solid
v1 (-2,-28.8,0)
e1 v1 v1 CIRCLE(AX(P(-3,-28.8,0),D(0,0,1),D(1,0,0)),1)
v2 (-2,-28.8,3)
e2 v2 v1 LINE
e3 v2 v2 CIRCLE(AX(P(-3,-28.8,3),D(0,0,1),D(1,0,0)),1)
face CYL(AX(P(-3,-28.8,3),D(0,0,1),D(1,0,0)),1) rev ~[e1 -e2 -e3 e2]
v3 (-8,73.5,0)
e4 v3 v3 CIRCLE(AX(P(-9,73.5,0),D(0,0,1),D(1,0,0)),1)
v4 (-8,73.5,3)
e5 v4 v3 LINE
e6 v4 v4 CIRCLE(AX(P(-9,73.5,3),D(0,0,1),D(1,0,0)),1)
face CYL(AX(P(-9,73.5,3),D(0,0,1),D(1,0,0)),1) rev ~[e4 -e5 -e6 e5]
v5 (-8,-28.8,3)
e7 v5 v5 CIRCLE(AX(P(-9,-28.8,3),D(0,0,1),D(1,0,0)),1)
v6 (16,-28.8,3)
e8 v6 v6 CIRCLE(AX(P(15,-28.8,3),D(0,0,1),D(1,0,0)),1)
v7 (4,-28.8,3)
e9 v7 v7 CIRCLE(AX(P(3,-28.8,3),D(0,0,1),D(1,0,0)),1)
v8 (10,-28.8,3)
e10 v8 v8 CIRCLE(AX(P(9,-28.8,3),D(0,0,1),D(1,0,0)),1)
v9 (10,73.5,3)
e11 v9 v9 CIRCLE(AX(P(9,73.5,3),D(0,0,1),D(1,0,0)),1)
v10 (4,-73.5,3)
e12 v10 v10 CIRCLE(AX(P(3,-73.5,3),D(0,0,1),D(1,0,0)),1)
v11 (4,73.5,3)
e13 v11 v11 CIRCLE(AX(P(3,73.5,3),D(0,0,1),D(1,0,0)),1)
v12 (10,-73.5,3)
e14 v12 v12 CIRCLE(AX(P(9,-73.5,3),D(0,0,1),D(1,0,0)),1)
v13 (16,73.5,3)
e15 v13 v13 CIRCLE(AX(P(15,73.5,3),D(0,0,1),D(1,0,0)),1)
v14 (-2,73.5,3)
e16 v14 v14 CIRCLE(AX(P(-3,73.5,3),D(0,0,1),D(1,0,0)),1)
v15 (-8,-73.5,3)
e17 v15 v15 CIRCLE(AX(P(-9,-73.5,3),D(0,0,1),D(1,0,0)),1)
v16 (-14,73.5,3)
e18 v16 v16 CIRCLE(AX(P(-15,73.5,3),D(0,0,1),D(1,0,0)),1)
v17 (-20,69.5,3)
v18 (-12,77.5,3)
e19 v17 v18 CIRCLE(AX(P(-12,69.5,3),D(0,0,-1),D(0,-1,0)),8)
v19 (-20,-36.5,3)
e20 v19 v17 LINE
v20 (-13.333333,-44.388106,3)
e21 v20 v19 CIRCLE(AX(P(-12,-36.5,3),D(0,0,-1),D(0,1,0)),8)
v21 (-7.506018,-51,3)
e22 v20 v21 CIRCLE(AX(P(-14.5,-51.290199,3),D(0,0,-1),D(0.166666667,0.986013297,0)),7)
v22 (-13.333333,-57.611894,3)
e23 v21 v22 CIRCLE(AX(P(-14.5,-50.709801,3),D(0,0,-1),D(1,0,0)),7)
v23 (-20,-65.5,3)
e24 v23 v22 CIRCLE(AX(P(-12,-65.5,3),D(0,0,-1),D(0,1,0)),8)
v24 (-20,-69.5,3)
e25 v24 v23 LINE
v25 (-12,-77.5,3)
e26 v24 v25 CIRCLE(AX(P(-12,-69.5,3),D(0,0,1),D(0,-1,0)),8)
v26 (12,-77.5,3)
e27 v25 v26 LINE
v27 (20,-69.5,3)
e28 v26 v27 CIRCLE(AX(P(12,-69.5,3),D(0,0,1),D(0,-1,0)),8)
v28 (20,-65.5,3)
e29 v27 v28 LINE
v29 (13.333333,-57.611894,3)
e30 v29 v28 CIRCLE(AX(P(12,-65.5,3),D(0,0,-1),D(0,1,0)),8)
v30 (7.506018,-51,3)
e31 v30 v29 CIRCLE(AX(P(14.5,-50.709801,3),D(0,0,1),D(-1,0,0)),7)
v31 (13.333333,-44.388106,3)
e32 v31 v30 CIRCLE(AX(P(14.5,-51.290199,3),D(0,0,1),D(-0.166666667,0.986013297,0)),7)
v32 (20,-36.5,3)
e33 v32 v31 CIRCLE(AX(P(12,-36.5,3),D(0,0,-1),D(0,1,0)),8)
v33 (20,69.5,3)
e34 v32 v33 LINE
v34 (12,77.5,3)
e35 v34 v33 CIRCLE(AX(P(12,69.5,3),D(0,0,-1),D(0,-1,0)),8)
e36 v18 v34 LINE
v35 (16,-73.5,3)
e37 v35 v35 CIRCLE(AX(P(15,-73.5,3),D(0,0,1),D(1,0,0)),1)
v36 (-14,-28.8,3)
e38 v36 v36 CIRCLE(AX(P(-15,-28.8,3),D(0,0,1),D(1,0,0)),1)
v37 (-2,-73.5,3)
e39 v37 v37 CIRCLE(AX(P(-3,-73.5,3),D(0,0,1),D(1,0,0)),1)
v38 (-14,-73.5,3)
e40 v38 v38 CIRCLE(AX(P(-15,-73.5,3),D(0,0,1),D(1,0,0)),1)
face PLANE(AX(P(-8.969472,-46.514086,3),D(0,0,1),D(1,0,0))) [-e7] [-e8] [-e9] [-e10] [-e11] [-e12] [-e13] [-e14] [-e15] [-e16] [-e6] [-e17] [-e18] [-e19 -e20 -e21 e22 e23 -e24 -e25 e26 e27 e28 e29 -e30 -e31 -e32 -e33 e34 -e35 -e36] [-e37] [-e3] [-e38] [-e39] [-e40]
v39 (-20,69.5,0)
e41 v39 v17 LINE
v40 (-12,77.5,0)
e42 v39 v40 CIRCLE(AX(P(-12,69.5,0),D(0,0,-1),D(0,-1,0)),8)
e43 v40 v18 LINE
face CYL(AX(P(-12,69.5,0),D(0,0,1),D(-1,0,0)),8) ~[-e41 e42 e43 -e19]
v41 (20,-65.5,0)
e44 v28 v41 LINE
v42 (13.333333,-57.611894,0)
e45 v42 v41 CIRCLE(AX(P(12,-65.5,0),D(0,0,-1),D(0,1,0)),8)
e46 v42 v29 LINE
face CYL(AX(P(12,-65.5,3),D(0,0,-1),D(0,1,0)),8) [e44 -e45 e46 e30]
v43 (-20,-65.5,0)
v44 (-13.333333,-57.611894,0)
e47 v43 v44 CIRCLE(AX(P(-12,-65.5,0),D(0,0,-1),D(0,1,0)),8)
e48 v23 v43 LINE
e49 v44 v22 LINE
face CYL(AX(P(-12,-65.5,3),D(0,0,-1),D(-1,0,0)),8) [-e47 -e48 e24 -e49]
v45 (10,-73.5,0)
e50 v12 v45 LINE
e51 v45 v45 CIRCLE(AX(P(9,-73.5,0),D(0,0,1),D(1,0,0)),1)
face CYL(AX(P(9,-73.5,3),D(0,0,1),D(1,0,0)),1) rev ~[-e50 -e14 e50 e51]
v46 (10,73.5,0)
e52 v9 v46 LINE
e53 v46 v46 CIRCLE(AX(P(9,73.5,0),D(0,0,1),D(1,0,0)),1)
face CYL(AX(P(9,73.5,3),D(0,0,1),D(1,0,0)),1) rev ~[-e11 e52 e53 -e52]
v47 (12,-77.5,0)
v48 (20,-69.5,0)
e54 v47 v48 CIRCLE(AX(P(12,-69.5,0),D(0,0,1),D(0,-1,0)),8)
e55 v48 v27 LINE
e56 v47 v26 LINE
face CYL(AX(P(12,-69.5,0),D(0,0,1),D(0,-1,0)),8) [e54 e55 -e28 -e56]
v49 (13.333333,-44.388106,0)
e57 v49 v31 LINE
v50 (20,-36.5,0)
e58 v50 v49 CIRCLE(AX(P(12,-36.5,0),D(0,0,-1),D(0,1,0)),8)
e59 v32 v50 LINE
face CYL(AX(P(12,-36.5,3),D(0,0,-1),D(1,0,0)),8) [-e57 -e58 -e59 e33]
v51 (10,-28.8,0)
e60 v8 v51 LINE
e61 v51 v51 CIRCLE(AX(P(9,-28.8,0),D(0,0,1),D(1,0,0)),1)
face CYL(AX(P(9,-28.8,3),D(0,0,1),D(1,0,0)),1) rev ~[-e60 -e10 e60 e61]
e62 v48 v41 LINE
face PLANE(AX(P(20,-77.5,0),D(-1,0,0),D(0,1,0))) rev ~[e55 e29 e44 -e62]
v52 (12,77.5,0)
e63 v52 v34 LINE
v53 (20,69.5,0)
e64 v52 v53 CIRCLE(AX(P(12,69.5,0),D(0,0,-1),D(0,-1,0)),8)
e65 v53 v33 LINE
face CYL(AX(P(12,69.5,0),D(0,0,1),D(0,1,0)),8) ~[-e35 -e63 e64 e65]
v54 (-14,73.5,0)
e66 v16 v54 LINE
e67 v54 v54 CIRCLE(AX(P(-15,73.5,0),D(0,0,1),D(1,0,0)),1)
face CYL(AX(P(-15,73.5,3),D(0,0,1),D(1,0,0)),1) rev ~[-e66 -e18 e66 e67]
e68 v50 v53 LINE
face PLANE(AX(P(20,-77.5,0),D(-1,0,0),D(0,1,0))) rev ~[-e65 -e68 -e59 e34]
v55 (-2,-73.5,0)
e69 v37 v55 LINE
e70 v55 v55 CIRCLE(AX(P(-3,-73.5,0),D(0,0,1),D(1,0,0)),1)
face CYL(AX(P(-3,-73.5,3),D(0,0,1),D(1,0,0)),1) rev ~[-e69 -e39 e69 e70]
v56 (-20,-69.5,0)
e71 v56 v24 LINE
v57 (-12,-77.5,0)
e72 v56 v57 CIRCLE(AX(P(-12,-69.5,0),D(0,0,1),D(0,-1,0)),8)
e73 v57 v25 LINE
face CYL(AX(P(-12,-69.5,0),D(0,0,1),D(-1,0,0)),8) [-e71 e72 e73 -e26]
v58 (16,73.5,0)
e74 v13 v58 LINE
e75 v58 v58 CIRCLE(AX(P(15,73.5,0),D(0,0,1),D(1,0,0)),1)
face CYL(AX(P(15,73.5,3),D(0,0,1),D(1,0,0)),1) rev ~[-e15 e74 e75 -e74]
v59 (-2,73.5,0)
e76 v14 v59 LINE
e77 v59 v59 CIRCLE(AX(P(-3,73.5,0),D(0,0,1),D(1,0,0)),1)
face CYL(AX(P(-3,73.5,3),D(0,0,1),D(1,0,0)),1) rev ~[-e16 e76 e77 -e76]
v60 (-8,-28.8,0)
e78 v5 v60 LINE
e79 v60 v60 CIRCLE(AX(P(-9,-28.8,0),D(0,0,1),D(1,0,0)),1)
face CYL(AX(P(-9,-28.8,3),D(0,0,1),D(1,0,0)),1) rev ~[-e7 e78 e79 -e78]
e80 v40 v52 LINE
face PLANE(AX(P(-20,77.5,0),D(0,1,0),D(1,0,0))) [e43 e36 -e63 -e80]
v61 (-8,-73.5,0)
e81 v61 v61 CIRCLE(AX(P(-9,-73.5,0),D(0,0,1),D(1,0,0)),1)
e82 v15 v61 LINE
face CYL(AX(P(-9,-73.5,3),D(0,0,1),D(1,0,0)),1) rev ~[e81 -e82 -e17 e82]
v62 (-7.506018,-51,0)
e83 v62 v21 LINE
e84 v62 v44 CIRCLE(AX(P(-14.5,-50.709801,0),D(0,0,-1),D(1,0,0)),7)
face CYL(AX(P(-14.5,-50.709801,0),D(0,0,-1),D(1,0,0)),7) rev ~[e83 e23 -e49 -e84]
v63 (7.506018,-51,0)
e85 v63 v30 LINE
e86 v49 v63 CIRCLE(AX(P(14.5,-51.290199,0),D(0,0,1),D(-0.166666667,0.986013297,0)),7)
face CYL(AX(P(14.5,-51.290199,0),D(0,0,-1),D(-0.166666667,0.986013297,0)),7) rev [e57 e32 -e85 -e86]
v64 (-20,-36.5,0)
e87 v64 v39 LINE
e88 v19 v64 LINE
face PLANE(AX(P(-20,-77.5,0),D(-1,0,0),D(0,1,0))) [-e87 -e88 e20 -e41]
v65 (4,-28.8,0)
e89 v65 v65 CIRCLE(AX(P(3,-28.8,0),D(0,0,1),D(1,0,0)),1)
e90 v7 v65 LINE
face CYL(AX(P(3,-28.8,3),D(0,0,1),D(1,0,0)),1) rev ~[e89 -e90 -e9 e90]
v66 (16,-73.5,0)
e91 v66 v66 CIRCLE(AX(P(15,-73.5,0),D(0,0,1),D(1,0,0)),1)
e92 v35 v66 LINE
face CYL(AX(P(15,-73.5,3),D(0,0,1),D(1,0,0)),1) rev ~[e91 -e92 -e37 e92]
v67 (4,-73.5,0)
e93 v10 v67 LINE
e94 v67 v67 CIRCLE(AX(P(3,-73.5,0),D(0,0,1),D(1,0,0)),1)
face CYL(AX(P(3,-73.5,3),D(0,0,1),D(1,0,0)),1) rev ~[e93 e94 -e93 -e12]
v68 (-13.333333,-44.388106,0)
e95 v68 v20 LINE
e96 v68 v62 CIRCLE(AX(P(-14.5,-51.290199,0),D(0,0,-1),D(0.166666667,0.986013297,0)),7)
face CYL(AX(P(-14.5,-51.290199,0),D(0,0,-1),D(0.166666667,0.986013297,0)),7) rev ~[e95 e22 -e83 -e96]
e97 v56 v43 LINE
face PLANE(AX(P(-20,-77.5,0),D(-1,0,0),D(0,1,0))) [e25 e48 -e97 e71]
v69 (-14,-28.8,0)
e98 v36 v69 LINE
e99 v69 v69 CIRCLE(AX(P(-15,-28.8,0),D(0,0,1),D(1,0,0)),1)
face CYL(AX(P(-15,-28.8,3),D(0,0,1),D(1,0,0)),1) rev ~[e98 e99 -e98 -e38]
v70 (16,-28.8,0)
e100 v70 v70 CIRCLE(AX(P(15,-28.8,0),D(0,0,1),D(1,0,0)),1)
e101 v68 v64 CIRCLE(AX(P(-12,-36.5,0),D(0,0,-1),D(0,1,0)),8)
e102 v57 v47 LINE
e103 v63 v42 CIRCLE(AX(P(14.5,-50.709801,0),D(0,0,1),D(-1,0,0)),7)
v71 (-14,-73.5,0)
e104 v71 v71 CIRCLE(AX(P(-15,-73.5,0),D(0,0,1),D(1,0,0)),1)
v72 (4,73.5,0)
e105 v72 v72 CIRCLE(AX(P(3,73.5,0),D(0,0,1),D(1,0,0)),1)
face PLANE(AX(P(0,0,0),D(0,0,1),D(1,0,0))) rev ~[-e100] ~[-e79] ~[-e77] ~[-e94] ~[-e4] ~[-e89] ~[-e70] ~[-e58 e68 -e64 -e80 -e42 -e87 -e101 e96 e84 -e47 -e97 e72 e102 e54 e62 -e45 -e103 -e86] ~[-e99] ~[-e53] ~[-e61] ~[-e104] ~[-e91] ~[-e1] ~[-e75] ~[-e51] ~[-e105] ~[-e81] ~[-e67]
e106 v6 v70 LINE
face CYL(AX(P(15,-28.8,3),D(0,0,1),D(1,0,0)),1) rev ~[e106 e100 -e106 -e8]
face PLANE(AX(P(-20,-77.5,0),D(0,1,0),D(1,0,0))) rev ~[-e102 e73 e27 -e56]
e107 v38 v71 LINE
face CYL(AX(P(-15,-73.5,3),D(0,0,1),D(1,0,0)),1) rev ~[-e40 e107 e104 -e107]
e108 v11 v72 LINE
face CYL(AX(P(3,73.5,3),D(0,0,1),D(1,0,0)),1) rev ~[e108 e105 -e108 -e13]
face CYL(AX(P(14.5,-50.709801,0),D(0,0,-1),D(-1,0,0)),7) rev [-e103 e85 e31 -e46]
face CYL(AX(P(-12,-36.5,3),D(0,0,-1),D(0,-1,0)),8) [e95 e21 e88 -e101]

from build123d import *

# Parameters (mm, degrees)
F0_W        = 40
F0_H        = 155
F1_DEPTH    = 3
F2_W        = 12.5
F2_H        = 13
F3_DEPTH    = 3
F4_R        = 8
F5_T1_DEPTH = 3
F6_R        = 1
F7_DEPTH    = 3


# Not quite as in the source:
# - a fillet or chamfer that OpenCascade refuses, or shapes differently, is made with other operations: its cross-section is extruded or revolved along the edge and cut away or added


with BuildPart() as f1:
    # F0 (on Top) → F1 (new body)
    with BuildSketch(Plane.XY):
        Rectangle(F0_W, F0_H)
    extrude(amount=F1_DEPTH)

    # F2 (on face) → F3 (cut, through all)
    with BuildSketch(Plane.XY.offset(3)):
        with Locations((-13.75, -51)):
            Rectangle(F2_W, F2_H)
        with Locations((13.75, -51)):
            Rectangle(F2_W, F2_H)
    extrude(amount=-F3_DEPTH, mode=Mode.SUBTRACT)

    # F4
    f4_edges = [f1.edges().sort_by_distance(p)[0] for p in [
        (-20, -44.5, 1.5),
        (20, -44.5, 1.5),
        (20, -57.5, 1.5),
        (-20, -57.5, 1.5),
        (-20, -77.5, 1.5),
        (20, -77.5, 1.5),
        (-20, 77.5, 1.5),
        (20, 77.5, 1.5),
    ]]
    fillet(f4_edges, radius=F4_R)

    # F5: fillet of radius 7 on 4 edges, made by hand

    # F5_s2 → F5_t1 (join)
    with BuildSketch(Plane.XY):
        with BuildLine():
            ThreePointArc((-13.3333333333, -44.3881063775), (-9.1536616892, -46.7717188872), (-7.5, -51.2901994578))
            Line((-7.5, -51.2901994578), (-6.8, -51.2901994578))
            Line((-6.8, -51.2901994578), (-6.8, -44.5))
            Line((-6.8, -44.5), (-7.5, -43.8))
            ThreePointArc((-7.5, -43.8), (-12, -43.8), (-13.2166666667, -43.6978970694))
            Line((-13.2166666667, -43.6978970694), (-13.3333333333, -44.3881063775))
        make_face()
        with BuildLine():
            ThreePointArc((-7.5, -50.7098005422), (-9.1536616892, -55.2282811128), (-13.3333333333, -57.6118936225))
            Line((-13.3333333333, -57.6118936225), (-13.2166666667, -58.3021029306))
            ThreePointArc((-13.2166666667, -58.3021029306), (-12, -58.2), (-7.5, -58.2))
            Line((-7.5, -58.2), (-6.8, -57.5))
            Line((-6.8, -57.5), (-6.8, -50.7098005422))
            Line((-6.8, -50.7098005422), (-7.5, -50.7098005422))
        make_face()
        with BuildLine():
            ThreePointArc((13.3333333333, -44.3881063775), (9.1536616892, -46.7717188872), (7.5, -51.2901994578))
            Line((7.5, -51.2901994578), (6.8, -51.2901994578))
            Line((6.8, -51.2901994578), (6.8, -44.5))
            Line((6.8, -44.5), (7.5, -43.8))
            ThreePointArc((7.5, -43.8), (12, -43.8), (13.2166666667, -43.6978970694))
            Line((13.2166666667, -43.6978970694), (13.3333333333, -44.3881063775))
        make_face()
        with BuildLine():
            ThreePointArc((7.5, -50.7098005422), (9.1536616892, -55.2282811128), (13.3333333333, -57.6118936225))
            Line((13.3333333333, -57.6118936225), (13.2166666667, -58.3021029306))
            ThreePointArc((13.2166666667, -58.3021029306), (12, -58.2), (7.5, -58.2))
            Line((7.5, -58.2), (6.8, -57.5))
            Line((6.8, -57.5), (6.8, -50.7098005422))
            Line((6.8, -50.7098005422), (7.5, -50.7098005422))
        make_face()
    extrude(amount=F5_T1_DEPTH)

    # F6 (on face) → F7 (cut, through all)
    with BuildSketch(Plane.XY.offset(3)):
        with Locations((-15, -73.5)):
            Circle(F6_R)
        with Locations((-9, -73.5)):
            Circle(F6_R)
        with Locations((-3, -73.5)):
            Circle(F6_R)
        with Locations((3, -73.5)):
            Circle(F6_R)
        with Locations((-15, -28.8)):
            Circle(F6_R)
        with Locations((-9, -28.8)):
            Circle(F6_R)
        with Locations((-3, -28.8)):
            Circle(F6_R)
        with Locations((3, -28.8)):
            Circle(F6_R)
        with Locations((-15, 73.5)):
            Circle(F6_R)
        with Locations((-9, 73.5)):
            Circle(F6_R)
        with Locations((-3, 73.5)):
            Circle(F6_R)
        with Locations((3, 73.5)):
            Circle(F6_R)
        with Locations((9, -73.5)):
            Circle(F6_R)
        with Locations((15, -73.5)):
            Circle(F6_R)
        with Locations((9, -28.8)):
            Circle(F6_R)
        with Locations((15, -28.8)):
            Circle(F6_R)
        with Locations((9, 73.5)):
            Circle(F6_R)
        with Locations((15, 73.5)):
            Circle(F6_R)
    extrude(amount=-F7_DEPTH, mode=Mode.SUBTRACT)


solid = f1.part
